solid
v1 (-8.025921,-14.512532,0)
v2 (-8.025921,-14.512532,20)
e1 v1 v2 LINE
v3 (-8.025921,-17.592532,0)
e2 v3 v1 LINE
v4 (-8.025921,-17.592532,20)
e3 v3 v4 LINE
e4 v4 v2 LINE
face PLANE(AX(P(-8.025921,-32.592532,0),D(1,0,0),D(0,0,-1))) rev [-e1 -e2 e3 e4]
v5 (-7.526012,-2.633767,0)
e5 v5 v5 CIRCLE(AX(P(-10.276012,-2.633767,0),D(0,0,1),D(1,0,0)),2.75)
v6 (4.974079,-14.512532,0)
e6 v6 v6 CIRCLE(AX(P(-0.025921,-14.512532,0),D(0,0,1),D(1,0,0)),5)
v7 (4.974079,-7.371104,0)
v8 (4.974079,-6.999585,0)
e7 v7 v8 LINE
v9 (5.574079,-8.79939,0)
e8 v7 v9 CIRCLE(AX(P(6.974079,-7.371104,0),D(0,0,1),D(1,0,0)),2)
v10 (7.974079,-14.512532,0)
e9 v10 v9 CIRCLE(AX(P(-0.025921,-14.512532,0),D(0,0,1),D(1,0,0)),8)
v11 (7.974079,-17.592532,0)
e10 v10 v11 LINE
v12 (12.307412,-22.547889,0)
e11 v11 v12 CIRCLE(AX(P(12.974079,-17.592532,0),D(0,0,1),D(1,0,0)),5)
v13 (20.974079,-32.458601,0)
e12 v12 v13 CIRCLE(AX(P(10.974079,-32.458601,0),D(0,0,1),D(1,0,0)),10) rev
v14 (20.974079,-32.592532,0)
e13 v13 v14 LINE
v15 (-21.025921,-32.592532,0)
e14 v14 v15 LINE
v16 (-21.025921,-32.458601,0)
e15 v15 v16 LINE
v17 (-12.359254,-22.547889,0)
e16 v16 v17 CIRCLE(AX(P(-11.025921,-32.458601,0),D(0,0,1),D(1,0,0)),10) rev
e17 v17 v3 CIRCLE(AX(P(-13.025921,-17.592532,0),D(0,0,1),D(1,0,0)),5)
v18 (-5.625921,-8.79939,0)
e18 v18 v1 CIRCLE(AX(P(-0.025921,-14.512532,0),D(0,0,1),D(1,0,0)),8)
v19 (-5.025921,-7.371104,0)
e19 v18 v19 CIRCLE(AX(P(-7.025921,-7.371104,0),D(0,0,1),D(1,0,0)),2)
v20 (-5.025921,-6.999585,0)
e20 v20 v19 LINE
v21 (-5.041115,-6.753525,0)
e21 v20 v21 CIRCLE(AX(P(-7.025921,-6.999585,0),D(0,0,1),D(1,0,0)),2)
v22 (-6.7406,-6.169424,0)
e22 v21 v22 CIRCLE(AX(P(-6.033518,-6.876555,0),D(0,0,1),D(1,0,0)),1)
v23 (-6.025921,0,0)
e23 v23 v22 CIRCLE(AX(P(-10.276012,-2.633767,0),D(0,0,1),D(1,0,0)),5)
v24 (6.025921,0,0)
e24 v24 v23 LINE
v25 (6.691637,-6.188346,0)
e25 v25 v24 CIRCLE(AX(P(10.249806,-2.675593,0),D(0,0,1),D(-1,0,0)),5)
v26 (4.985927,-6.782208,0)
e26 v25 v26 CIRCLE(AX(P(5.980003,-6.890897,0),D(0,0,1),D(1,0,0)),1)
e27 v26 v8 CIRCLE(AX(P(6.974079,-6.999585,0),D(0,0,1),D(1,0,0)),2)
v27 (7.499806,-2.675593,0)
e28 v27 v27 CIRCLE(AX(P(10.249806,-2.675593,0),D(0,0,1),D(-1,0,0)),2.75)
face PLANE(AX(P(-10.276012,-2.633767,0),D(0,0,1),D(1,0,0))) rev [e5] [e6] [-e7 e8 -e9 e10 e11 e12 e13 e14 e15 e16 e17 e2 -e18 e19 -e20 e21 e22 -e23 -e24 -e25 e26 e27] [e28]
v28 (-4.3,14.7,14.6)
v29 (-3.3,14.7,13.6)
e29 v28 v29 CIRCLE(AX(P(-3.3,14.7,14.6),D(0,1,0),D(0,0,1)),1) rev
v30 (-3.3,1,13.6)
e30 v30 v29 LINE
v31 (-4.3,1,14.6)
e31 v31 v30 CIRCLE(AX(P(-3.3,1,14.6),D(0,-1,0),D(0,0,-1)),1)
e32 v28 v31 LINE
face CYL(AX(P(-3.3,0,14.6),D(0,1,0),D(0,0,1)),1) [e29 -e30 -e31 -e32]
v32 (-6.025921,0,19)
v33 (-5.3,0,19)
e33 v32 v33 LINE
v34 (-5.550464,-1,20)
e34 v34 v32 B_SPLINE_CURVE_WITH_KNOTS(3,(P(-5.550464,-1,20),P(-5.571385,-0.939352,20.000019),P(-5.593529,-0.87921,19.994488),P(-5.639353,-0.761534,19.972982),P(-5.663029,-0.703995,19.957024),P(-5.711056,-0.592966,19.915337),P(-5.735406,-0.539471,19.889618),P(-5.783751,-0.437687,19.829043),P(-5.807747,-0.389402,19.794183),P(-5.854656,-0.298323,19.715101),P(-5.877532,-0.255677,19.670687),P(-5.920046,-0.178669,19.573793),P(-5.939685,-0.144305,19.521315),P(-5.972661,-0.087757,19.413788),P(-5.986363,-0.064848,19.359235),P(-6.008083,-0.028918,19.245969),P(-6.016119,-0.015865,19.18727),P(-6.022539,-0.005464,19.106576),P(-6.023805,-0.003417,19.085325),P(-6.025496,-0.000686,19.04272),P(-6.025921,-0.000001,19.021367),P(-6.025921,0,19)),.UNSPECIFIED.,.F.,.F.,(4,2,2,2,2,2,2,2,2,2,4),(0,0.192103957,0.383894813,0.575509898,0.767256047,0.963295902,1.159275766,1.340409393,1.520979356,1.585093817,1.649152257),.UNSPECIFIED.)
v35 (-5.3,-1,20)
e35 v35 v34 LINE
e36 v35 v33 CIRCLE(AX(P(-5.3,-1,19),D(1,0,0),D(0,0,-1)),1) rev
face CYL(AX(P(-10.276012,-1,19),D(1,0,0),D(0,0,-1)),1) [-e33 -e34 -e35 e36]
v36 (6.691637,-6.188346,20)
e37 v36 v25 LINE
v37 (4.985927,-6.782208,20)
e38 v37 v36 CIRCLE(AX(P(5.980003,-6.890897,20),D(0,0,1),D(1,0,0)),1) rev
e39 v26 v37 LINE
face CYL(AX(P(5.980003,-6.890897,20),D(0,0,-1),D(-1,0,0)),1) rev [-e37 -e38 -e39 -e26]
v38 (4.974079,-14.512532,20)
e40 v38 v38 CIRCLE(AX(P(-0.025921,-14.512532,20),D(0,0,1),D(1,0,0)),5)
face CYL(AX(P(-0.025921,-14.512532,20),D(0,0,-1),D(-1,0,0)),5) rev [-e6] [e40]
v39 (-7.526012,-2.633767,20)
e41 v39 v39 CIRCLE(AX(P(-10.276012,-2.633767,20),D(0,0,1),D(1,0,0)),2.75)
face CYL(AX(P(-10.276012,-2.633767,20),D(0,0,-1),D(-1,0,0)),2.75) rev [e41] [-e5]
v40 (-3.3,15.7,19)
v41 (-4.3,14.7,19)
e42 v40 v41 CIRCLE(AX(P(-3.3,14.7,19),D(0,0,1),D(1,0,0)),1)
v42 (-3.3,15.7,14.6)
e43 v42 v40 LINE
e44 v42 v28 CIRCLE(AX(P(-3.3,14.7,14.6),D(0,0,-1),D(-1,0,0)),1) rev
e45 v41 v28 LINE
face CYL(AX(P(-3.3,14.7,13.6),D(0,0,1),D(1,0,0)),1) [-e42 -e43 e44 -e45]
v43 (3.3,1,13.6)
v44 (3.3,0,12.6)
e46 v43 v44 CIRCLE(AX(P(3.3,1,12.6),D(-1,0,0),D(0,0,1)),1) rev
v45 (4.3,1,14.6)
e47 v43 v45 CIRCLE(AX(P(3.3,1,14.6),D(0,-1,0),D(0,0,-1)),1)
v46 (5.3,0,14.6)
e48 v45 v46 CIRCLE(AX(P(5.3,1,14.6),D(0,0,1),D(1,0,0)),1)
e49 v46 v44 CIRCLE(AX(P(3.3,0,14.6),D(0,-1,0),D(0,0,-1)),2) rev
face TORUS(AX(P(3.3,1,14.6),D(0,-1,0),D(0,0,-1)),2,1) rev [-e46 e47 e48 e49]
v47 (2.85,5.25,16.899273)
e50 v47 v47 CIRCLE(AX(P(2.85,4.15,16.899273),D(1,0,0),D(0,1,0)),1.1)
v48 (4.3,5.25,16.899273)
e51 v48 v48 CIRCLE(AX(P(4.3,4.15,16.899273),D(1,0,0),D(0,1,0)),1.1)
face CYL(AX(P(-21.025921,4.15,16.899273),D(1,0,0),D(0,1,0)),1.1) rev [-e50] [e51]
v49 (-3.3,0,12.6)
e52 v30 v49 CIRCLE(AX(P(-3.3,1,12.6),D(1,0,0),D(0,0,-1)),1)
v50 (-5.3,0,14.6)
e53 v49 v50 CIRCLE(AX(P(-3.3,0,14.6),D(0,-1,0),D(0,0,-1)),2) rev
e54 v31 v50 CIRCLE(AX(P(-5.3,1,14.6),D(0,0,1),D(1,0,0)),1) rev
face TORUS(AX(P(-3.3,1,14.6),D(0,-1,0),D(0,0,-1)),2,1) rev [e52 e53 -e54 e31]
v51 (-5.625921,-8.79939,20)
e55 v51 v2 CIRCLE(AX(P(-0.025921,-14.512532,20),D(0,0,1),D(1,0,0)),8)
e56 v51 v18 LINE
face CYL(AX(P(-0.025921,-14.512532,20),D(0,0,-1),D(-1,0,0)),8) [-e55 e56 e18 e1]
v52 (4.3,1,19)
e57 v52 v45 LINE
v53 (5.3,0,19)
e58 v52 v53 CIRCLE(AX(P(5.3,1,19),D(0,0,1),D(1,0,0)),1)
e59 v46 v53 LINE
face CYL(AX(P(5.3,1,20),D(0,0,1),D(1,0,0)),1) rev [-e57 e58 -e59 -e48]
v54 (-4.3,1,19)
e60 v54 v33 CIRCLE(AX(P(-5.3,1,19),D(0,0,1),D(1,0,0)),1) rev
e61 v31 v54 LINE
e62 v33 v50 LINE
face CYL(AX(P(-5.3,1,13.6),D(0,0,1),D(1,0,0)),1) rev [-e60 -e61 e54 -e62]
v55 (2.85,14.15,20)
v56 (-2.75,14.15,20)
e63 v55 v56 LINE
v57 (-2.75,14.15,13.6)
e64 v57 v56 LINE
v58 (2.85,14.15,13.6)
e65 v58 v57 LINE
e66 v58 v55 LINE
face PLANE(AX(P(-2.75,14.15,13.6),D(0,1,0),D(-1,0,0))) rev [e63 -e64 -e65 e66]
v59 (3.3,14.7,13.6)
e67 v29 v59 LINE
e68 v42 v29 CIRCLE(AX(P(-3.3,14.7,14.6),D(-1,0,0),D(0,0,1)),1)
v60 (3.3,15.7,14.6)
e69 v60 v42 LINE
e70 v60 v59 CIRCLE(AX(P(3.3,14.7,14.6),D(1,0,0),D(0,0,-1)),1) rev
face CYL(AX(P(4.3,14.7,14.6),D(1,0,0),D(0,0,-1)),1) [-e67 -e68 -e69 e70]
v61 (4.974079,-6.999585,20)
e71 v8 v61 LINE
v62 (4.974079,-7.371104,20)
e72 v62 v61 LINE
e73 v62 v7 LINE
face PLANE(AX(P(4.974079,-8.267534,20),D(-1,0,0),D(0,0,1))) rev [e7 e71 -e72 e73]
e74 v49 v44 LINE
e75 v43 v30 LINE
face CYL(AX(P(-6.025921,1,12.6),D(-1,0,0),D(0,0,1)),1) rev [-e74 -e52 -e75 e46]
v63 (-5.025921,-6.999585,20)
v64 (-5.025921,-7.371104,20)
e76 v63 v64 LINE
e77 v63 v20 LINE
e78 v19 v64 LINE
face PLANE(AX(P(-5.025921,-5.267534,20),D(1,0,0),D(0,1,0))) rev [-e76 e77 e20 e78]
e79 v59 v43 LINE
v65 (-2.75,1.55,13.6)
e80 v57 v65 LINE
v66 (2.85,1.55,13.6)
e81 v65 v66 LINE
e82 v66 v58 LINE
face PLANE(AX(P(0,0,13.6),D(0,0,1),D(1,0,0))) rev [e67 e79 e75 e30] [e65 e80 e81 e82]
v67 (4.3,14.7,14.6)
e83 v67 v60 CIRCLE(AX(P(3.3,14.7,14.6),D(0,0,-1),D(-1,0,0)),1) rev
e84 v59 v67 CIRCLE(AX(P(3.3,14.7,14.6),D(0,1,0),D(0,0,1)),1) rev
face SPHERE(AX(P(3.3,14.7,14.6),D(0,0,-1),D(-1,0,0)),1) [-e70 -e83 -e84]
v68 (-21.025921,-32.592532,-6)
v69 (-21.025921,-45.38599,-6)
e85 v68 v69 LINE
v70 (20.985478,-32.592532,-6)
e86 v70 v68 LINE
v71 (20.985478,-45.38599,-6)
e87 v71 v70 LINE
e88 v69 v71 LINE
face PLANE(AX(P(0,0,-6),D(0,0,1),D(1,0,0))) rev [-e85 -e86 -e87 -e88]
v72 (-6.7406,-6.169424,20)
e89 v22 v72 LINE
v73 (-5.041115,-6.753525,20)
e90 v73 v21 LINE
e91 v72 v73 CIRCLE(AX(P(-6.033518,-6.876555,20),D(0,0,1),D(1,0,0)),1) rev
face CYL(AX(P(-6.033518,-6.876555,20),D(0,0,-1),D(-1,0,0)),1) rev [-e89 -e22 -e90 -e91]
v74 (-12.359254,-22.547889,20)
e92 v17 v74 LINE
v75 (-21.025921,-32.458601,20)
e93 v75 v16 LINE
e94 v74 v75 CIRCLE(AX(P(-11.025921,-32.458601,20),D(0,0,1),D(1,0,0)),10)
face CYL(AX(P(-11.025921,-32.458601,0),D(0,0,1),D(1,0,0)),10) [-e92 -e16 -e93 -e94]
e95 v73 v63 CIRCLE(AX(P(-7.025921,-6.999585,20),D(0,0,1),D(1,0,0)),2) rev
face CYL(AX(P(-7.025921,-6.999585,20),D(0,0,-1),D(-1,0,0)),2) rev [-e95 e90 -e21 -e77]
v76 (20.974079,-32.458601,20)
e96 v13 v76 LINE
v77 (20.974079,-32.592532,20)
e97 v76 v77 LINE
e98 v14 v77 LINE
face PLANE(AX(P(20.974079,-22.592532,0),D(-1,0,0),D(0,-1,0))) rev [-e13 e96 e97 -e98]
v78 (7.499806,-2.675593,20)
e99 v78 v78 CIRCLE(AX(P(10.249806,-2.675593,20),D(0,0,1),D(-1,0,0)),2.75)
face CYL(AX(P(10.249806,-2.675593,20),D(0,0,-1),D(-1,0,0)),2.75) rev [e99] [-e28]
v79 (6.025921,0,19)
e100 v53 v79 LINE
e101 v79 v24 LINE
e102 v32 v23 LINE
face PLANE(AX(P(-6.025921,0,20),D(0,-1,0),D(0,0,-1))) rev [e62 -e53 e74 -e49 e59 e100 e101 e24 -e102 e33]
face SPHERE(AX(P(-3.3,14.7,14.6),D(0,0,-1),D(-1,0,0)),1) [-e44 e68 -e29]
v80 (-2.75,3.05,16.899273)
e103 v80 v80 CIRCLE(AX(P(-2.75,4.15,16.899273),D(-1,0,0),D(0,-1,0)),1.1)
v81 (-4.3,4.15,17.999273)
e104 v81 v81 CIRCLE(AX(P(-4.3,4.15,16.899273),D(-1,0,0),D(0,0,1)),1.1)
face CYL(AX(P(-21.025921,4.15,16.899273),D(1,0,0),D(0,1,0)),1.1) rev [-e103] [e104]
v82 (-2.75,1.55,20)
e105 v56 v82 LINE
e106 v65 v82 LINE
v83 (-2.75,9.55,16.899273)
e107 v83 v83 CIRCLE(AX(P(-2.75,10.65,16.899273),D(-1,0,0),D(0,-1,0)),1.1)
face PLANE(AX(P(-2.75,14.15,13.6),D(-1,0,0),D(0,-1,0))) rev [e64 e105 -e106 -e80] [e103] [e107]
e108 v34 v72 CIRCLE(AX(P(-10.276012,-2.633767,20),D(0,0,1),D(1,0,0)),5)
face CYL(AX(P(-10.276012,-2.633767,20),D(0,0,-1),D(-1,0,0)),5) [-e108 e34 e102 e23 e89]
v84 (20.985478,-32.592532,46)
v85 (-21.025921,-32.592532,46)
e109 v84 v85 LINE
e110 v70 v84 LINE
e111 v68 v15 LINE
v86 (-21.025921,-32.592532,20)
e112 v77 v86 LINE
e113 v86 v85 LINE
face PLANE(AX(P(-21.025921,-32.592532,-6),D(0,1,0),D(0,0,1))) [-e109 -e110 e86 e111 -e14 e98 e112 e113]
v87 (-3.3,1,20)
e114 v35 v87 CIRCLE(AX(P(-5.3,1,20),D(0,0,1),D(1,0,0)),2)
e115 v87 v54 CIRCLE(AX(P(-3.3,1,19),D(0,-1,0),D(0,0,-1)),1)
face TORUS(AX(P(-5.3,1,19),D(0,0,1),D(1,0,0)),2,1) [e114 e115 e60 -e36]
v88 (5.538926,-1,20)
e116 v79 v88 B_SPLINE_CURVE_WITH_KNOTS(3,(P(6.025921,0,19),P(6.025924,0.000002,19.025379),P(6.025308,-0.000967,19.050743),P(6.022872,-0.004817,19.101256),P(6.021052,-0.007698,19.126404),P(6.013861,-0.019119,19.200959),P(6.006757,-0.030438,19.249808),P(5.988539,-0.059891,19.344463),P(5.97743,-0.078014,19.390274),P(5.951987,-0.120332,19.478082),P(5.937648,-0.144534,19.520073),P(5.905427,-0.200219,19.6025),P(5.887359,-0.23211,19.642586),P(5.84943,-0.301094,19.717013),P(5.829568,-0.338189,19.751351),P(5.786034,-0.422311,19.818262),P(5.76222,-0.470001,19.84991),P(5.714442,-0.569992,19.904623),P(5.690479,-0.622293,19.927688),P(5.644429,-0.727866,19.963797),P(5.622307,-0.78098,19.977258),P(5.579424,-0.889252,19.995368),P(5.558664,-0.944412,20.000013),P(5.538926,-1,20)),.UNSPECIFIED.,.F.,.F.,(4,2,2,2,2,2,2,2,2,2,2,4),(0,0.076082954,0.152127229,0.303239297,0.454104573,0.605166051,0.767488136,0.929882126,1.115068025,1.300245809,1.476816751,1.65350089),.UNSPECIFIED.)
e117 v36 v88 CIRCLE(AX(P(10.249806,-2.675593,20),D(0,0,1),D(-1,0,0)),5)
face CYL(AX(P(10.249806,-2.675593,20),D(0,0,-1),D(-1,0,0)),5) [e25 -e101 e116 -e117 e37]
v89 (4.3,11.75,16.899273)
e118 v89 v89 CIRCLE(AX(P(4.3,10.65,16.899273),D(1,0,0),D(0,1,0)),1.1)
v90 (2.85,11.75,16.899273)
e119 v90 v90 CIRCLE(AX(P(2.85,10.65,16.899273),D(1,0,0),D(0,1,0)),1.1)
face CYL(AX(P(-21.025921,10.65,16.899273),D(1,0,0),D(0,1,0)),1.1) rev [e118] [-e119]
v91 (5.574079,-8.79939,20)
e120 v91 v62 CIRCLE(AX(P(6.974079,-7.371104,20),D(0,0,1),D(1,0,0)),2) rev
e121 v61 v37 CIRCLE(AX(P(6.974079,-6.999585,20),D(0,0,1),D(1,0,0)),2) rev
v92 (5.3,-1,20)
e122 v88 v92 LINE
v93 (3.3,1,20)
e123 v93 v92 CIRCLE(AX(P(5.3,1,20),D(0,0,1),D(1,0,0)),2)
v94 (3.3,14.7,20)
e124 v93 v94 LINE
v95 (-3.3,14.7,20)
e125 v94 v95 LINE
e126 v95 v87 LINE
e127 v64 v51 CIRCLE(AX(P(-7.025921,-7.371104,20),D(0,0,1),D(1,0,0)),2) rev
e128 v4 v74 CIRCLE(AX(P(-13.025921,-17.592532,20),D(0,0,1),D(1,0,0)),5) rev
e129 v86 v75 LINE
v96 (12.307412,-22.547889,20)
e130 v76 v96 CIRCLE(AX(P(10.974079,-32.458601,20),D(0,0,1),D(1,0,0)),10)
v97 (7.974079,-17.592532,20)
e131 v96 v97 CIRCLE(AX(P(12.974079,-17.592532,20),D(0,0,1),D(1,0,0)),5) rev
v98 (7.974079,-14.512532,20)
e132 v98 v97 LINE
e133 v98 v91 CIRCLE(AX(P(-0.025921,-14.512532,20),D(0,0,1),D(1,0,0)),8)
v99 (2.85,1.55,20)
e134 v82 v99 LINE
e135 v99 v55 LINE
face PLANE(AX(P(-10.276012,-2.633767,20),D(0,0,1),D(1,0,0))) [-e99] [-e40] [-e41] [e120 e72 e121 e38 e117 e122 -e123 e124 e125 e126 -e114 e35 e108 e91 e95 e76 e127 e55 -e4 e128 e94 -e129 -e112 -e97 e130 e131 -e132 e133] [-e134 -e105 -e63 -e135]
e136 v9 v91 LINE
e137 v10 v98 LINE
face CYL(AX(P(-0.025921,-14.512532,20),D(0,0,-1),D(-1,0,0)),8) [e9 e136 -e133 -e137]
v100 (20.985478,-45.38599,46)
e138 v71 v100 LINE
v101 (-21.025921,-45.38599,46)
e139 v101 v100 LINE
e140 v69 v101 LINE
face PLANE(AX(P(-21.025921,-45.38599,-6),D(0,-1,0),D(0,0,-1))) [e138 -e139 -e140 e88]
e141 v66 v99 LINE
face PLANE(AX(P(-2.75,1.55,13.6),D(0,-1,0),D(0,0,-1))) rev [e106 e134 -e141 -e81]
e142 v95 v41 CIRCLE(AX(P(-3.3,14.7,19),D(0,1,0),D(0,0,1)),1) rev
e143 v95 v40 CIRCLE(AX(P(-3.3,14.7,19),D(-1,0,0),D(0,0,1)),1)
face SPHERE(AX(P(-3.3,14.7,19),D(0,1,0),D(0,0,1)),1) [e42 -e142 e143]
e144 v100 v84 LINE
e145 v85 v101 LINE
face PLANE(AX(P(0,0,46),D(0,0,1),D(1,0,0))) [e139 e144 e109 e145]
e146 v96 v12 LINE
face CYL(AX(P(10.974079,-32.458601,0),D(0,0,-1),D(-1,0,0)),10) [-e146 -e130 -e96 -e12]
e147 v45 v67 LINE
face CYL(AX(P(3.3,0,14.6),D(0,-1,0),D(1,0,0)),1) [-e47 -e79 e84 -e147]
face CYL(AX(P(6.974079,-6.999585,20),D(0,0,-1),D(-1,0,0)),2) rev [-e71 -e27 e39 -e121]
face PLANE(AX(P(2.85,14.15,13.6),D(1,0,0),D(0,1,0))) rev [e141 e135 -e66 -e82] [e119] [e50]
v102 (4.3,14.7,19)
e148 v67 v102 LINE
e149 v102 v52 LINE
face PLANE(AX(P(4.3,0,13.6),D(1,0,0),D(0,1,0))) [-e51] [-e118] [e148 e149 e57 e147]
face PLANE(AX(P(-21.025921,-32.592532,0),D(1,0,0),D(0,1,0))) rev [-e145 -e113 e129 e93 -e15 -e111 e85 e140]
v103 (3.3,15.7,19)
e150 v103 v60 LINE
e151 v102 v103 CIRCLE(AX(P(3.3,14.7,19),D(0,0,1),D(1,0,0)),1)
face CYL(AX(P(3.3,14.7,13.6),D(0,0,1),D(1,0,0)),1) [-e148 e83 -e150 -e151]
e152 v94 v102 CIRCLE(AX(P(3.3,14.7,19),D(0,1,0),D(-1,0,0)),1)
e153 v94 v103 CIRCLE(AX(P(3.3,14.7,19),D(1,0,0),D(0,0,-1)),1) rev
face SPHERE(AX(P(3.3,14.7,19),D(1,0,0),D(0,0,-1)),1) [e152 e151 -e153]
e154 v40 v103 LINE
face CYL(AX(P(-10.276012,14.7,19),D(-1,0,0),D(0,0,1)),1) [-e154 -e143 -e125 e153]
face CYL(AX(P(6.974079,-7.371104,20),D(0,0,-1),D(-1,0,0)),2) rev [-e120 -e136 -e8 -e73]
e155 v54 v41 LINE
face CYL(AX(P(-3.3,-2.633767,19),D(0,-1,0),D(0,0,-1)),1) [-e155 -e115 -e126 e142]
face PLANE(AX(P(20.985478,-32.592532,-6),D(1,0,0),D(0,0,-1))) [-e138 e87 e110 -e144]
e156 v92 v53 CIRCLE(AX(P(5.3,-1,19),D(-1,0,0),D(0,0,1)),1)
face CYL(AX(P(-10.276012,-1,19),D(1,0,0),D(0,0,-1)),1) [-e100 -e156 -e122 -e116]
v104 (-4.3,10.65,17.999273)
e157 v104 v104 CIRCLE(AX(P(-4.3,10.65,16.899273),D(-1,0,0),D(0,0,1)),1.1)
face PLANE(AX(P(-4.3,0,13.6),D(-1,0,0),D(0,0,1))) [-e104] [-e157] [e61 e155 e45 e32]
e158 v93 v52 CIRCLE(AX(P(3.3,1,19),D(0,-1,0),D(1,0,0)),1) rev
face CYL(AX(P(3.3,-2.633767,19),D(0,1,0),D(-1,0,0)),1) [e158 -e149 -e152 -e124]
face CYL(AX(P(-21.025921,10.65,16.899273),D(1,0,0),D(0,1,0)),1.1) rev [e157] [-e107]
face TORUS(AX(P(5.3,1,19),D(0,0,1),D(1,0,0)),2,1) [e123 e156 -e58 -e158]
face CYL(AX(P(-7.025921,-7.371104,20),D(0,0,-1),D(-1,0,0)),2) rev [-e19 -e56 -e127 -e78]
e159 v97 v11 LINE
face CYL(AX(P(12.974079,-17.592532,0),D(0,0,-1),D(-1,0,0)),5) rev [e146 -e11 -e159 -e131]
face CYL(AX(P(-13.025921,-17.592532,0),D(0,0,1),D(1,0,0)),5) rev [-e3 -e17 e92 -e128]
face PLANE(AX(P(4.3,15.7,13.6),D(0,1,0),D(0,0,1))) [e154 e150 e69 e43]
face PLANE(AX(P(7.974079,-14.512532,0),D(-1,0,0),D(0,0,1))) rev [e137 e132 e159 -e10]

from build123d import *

# Parameters (mm, degrees)
CROQUIS1_R                 = 5
CROQUIS1_R_2               = 2.75
SALIENTE_EXTRUIR1_DEPTH    = 20
SALIENTE_EXTRUIR4_DEPTH    = 10
CROQUIS7_W                 = 42
CROQUIS7_H                 = 10
EXTRUIR_L_MINA1_DEPTH      = 20
CROQUIS8_W                 = 42.01139879
CROQUIS8_H                 = 12.793457143
SALIENTE_EXTRUIR6_DEPTH    = 26
REDONDEO1_R                = 2
REDONDEO2_R                = 1
CROQUIS9_W                 = 8.6
CROQUIS9_H                 = 15.7
CROQUIS9_W_2               = 5.6
CROQUIS9_H_2               = 12.6
SALIENTE_EXTRUIR7_DEPTH    = 6.4
CORTAR_EXTRUIR1_DEPTH      = 70.406702341
CORTAR_EXTRUIR1_DEPTH_BACK = 70.406702341
CROQUIS11_R                = 1.1
REDONDEO3_R                = 1
REDONDEO4_R                = 5
REDONDEO5_R                = 10


# Some blends are built 0.0001 mm under size
with BuildPart() as part:
    # Croquis1 → Saliente-Extruir1 (new body)
    with BuildSketch(Plane.XY):
        with BuildLine():
            Line((-5.025921035, -5.26753442), (-5.025921035, -8.26753442))
            ThreePointArc((-5.025921035, -8.26753442), (-0.025921035, -22.512532419), (4.974078965, -8.26753442))
            Line((4.974078965, -8.26753442), (4.974078965, -5.26753442))
            Line((4.974078965, -5.26753442), (5.974078965, -5.26753442))
            ThreePointArc((5.974078965, -5.26753442), (15.249563623, -2.724799651), (6.025921035, 0))
            Line((6.025921035, 0), (5.025921035, 0))
            Line((5.025921035, 0), (-5.025921035, 0))
            Line((-5.025921035, 0), (-6.025921035, 0))
            ThreePointArc((-6.025921035, 0), (-15.276011655, -2.63376721), (-6.025921035, -5.26753442))
            Line((-6.025921035, -5.26753442), (-5.025921035, -5.26753442))
        make_face()
        with Locations((-0.025921035, -14.512532419)):
            Circle(CROQUIS1_R, mode=Mode.SUBTRACT)
        with Locations((-10.276011655, -2.63376721)):
            Circle(CROQUIS1_R_2, mode=Mode.SUBTRACT)
        with Locations(Location((10.249805759, -2.675592988, 0), (0, 0, 180))):
            Circle(CROQUIS1_R_2, mode=Mode.SUBTRACT)
    extrude(amount=SALIENTE_EXTRUIR1_DEPTH)

    # Croquis5 → Saliente-Extruir4 (add, symmetric)
    with BuildSketch(Plane(origin=(0, 0, 10), x_dir=(-1, 0, 0), z_dir=(0, 0, -1))):
        with BuildLine():
            Line((-7.974078965, -14.512532419), (-7.974078965, -32.592532419))
            Line((-7.974078965, -32.592532419), (8.025921035, -32.592532419))
            Line((8.025921035, -32.592532419), (8.025921035, -14.512532419))
            ThreePointArc((8.025921035, -14.512532419), (0.025921035, -22.512532419), (-7.974078965, -14.512532419))
        make_face()
    extrude(amount=SALIENTE_EXTRUIR4_DEPTH, both=True)

    # Croquis7 → Extruir-Lámina1 (add)
    with BuildSketch(Plane.XY.offset(20)):
        with Locations((-0.025921035, -27.592532419)):
            Rectangle(CROQUIS7_W, CROQUIS7_H)
    extrude(amount=-EXTRUIR_L_MINA1_DEPTH)

    # Croquis8 → Saliente-Extruir6 (add, symmetric)
    with BuildSketch(Plane.XY.offset(20)):
        with Locations((-0.02022164, -38.989260991)):
            Rectangle(CROQUIS8_W, CROQUIS8_H)
    extrude(amount=SALIENTE_EXTRUIR6_DEPTH, both=True)

    # Redondeo1
    # the kernel refuses this fillet: 2 mm, written as the material it adds along each edge
    with BuildSketch(Plane(origin=(-5.025921035, -8.26753442, 0), x_dir=(0, 1, 0), z_dir=(0, 0, 1))) as redondeo1_piece_1:
        with BuildLine():
            CenterArc((0.89643043, 2), REDONDEO1_R, 224.427004001, 45.572995999)
            Line((-0.531855256, 0.6), (-0.560420969, 0.572))
            ThreePointArc((-0.560420969, 0.572), (-0.288339065, 0.280133933), (-0.03122499, -0.025))
            Line((-0.03122499, -0.025), (0, -0.04))
            Line((0, -0.04), (0.89643043, -0.04))
            Line((0.89643043, -0.04), (0.89643043, 0))
        make_face()
    extrude(amount=20)
    with BuildSketch(Plane(origin=(4.974078965, -8.26753442, 0), x_dir=(0.7483239866610061, -0.6633334086172491, 0), z_dir=(0, 0, 1))) as redondeo1_piece_2:
        with BuildLine():
            CenterArc((0.902015721, 1.99748721), REDONDEO1_R, 221.554595727, 45.572995999)
            Line((-0.594632253, 0.670820393), (-0.624565212, 0.644287057))
            Line((-0.624565212, 0.644287057), (-0.029932959, -0.026533336))
            Line((-0.029932959, -0.026533336), (0.002004479, -0.039949744))
            ThreePointArc((0.002004479, -0.039949744), (0.400895876, -0.029948842), (0.799787272, -0.039949744))
            Line((0.799787272, -0.039949744), (0.801791752, 0))
        make_face()
    extrude(amount=20)
    with BuildSketch(Plane(origin=(-5.025921035, -5.26753442, 0), x_dir=(-1, 0, 0), z_dir=(0, 0, 1))) as redondeo1_piece_3:
        with BuildLine():
            CenterArc((2, 1.732050808), REDONDEO1_R, 180, 60)
            Line((0, 1.732050808), (-0.04, 1.732050808))
            Line((-0.04, 1.732050808), (-0.04, 0))
            Line((-0.04, 0), (0, -0.04))
            ThreePointArc((0, -0.04), (0.5, -0.04), (0.98, -0.034641016))
            Line((0.98, -0.034641016), (1, 0))
        make_face()
    extrude(amount=20)
    with BuildSketch(Plane(origin=(4.974078965, -5.26753442, 0), x_dir=(0, -1, 0), z_dir=(0, 0, 1))) as redondeo1_piece_4:
        with BuildLine():
            CenterArc((1.732050808, 2), REDONDEO1_R, 210, 60)
            Line((0, 1), (-0.034641016, 0.98))
            ThreePointArc((-0.034641016, 0.98), (-0.04, 0.5), (-0.04, 0))
            Line((-0.04, 0), (0, -0.04))
            Line((0, -0.04), (1.732050808, -0.04))
            Line((1.732050808, -0.04), (1.732050808, 0))
        make_face()
    extrude(amount=20)

    # Redondeo2
    redondeo2_edges = [part.edges().sort_by_distance(p)[0] for p in [
        (-6.025921035, -5.26753442, 10),
        (5.974078965, -5.26753442, 10),
    ]]
    fillet(redondeo2_edges, radius=REDONDEO2_R)

    # Croquis9 → Saliente-Extruir7 (add)
    with BuildSketch(Plane.XY.offset(20)):
        with Locations((0, 7.85)):
            Rectangle(CROQUIS9_W, CROQUIS9_H)
        with Locations((0.05, 7.85)):
            Rectangle(CROQUIS9_W_2, CROQUIS9_H_2, mode=Mode.SUBTRACT)
    extrude(amount=-SALIENTE_EXTRUIR7_DEPTH)

    # Croquis11 → Cortar-Extruir1 (cut, two sides: drawn at the far end of the back side and taken through both)
    with BuildSketch(Plane(origin=(4.3, 0, 0), x_dir=(0, 0, -1), z_dir=(1, 0, 0)).offset(-CORTAR_EXTRUIR1_DEPTH_BACK)):
        with Locations(Location((-16.899272709, 10.65, 0), (0, 0, 90))):
            Circle(CROQUIS11_R)
        with Locations(Location((-16.899272709, 4.15, 0), (0, 0, 90))):
            Circle(CROQUIS11_R)
    extrude(amount=CORTAR_EXTRUIR1_DEPTH + CORTAR_EXTRUIR1_DEPTH_BACK, mode=Mode.SUBTRACT)

    # Redondeo3
    redondeo3_edges = [part.edges().sort_by_distance(p)[0] for p in [
        (-5.162960517, 0, 20),
        (4.3, 7.85, 13.6),
        (4.3, 15.7, 16.8),
        (0, 0, 13.6),
        (4.3, 0, 16.8),
        (-4.3, 7.85, 13.6),
        (-4.3, 0, 16.8),
        (0, 15.7, 13.6),
        (-4.3, 15.7, 16.8),
        (4.3, 7.85, 20),
        (0, 15.7, 20),
        (-4.3, 7.85, 20),
        (5.162960517, 0, 20),
    ]]
    fillet(redondeo3_edges, radius=REDONDEO3_R)

    # Redondeo4
    redondeo4_edges = [part.edges().sort_by_distance(p)[0] for p in [
        (-8.025921035, -22.592532419, 10),
        (7.974078965, -22.592532419, 10),
    ]]
    fillet(redondeo4_edges, radius=REDONDEO4_R)

    # Redondeo5
    redondeo5_edges = [part.edges().sort_by_distance(p)[0] for p in [
        (-21.025921035, -22.592532419, 10),
        (20.974078965, -22.592532419, 10),
    ]]
    fillet(redondeo5_edges, radius=REDONDEO5_R - 0.0001)  # a hair under: the kernel refuses the full size


solid = part.part
